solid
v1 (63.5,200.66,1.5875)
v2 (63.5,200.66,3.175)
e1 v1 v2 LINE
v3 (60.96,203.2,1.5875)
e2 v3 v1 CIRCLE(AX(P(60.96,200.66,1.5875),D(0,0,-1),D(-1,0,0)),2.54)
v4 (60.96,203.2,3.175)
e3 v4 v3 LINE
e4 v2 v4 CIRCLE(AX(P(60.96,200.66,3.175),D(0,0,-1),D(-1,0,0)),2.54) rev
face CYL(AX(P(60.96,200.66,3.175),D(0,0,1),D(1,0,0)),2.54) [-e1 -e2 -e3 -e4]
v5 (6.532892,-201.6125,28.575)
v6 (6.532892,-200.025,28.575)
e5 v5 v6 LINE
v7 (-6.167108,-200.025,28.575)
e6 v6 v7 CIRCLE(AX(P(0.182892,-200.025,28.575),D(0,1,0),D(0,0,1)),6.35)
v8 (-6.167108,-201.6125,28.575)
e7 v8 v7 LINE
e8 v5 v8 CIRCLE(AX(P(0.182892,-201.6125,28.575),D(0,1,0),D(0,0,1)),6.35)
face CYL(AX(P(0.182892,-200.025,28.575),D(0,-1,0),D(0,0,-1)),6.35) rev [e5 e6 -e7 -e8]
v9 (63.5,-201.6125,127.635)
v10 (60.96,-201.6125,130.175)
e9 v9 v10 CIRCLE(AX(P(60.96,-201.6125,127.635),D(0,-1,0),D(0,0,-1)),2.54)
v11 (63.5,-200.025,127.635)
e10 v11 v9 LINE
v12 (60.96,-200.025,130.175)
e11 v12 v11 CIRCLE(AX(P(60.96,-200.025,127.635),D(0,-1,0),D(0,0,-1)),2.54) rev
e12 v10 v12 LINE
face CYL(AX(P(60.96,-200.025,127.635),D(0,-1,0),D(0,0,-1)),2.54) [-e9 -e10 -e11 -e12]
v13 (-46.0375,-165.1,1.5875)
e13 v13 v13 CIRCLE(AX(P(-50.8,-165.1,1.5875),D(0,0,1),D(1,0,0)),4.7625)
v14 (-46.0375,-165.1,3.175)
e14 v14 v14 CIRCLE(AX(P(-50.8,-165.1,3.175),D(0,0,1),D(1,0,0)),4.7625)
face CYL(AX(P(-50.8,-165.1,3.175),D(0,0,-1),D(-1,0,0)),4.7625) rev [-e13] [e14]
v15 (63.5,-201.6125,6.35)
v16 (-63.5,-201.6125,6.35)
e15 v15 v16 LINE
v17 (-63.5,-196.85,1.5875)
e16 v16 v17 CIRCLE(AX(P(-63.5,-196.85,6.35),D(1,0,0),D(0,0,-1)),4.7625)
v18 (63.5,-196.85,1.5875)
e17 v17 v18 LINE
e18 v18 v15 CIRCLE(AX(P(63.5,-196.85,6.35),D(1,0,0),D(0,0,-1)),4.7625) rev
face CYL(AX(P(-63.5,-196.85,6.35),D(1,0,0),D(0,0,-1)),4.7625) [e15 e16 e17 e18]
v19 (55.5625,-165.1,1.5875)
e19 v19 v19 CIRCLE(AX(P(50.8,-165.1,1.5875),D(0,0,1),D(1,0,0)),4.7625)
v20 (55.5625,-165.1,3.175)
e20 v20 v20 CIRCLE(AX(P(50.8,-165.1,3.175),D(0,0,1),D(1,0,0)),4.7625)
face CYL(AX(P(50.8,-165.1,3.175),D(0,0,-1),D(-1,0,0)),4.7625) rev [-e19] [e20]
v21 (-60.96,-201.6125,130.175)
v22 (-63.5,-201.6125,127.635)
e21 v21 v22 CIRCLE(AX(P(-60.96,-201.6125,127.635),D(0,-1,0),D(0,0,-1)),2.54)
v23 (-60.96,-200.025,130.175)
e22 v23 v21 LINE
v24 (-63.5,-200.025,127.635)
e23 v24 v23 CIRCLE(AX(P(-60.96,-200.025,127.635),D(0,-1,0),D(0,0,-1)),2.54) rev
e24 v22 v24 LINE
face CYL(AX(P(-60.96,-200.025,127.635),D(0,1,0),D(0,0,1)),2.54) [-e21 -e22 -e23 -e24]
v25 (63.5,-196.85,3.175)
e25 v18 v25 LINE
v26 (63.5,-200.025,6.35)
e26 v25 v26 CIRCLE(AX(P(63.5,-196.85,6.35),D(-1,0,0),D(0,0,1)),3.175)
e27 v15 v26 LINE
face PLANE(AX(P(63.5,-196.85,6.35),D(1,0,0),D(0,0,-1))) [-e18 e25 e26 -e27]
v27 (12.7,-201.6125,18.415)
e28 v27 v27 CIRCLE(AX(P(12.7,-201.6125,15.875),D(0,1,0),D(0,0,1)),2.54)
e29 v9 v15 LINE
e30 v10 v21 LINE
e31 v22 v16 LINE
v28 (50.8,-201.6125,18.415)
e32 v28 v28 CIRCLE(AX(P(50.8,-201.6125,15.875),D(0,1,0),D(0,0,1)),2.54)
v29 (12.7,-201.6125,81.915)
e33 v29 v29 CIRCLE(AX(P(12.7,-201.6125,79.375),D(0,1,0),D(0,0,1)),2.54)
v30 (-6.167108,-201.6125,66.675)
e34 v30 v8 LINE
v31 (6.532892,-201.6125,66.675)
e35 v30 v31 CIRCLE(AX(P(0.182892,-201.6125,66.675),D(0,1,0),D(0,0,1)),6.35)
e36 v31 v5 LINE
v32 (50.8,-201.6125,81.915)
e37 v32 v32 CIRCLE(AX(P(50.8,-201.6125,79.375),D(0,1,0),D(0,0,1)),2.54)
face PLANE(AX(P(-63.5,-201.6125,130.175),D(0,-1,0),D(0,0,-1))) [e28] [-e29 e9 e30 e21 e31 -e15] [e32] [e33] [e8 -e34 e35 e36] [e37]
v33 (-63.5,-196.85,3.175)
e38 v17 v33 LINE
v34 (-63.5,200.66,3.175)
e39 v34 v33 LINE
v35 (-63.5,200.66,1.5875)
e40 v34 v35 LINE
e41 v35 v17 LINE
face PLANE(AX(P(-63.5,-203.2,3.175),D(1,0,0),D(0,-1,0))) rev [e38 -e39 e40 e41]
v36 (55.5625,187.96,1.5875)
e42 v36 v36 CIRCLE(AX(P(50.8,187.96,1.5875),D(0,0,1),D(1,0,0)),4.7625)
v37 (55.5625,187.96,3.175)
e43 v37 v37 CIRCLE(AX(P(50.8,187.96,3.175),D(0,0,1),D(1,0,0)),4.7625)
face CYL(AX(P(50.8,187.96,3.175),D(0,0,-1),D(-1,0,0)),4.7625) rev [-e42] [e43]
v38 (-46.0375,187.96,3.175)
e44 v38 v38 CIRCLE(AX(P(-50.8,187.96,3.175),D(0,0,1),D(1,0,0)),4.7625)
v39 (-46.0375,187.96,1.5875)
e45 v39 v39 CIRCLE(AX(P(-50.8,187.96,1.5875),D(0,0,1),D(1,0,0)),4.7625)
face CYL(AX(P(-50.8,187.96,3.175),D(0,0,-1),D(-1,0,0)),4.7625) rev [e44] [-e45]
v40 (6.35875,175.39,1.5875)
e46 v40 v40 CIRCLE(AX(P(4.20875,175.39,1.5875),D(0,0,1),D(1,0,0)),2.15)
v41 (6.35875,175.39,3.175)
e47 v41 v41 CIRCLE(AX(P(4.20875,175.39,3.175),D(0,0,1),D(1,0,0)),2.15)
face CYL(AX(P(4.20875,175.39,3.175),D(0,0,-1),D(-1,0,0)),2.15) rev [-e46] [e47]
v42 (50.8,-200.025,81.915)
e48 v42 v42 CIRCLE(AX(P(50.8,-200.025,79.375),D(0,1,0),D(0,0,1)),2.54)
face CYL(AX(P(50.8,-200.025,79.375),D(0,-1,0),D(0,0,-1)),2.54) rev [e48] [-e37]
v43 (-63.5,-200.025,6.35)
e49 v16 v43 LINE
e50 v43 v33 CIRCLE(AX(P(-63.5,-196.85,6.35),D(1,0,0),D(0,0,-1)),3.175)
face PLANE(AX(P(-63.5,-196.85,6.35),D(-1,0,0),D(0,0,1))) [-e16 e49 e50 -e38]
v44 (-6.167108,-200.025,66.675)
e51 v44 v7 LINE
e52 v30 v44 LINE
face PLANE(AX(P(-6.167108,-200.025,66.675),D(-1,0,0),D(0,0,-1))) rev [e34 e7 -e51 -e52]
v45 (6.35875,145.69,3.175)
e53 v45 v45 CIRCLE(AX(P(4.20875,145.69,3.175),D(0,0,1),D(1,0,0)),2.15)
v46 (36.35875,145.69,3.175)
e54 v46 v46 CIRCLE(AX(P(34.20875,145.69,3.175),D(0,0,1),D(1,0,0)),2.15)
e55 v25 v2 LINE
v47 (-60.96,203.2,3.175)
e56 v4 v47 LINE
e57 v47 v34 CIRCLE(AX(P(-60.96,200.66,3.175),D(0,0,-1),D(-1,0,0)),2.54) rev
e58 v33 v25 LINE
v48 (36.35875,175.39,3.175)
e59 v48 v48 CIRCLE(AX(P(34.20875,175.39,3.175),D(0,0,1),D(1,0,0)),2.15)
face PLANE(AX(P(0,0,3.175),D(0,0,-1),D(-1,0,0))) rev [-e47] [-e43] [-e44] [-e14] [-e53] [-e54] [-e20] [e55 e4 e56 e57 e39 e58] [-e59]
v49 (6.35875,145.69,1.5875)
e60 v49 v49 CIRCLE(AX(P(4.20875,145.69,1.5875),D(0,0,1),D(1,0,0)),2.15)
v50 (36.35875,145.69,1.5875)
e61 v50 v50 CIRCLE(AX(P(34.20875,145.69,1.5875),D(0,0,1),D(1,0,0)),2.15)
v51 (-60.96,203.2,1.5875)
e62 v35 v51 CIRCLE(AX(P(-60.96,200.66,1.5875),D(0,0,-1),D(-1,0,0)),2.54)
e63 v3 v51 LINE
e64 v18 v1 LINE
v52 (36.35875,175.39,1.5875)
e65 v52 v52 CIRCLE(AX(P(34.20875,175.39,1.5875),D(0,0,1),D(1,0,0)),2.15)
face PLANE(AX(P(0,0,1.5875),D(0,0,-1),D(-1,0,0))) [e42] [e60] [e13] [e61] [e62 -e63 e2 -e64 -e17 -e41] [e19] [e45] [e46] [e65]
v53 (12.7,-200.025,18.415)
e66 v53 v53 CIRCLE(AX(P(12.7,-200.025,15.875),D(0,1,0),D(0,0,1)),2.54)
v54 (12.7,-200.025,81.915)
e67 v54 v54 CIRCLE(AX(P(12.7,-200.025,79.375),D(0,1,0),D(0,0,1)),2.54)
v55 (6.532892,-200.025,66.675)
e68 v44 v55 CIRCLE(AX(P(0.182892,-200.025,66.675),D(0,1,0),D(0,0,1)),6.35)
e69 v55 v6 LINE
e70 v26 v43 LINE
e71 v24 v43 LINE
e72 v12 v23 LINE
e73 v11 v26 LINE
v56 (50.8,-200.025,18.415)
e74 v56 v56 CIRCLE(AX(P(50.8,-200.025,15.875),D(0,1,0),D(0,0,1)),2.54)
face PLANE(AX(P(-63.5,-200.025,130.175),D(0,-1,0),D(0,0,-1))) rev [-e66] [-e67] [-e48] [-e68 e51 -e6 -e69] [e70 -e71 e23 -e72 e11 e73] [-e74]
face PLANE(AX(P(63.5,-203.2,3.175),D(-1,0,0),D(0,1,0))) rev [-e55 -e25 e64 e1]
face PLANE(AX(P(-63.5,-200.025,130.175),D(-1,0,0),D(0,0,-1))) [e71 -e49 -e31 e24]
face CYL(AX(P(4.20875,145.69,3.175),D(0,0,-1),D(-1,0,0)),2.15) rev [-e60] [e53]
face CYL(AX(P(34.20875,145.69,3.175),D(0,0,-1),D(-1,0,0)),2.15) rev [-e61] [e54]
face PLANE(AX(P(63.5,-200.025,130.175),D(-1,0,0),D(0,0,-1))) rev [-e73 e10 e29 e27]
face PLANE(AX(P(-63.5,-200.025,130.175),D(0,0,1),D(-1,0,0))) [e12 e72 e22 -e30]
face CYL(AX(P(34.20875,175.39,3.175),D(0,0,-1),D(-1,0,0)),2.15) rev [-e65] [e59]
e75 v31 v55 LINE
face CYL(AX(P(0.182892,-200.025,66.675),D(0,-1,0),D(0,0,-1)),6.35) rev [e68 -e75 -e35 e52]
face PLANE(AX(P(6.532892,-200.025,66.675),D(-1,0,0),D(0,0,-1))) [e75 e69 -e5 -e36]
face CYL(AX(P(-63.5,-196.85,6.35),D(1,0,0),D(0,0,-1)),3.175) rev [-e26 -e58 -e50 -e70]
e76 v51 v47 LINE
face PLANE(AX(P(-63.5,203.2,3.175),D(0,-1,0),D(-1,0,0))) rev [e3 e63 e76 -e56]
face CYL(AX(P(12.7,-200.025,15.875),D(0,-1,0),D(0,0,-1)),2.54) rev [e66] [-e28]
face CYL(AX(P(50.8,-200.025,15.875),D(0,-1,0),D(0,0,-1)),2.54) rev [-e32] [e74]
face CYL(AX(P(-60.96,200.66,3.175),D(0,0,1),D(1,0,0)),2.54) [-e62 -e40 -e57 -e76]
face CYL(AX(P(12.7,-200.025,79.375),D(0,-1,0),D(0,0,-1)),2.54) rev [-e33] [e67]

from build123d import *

# Parameters (mm, degrees)
SKETCH2_W            = 127
SKETCH2_H            = 406.4
BOSS_EXTRUDE1_DEPTH  = 3.175
SKETCH3_W            = 127
SKETCH3_H            = 3.175
BOSS_EXTRUDE2_DEPTH  = 127
FILLET1_R            = 3.175
SKETCH4_R            = 2.54
CUT_EXTRUDE1_DEPTH   = 429.448574802
SKETCH5_R            = 4.7625
SKETCH5_R_2          = 2.15
CUT_EXTRUDE2_DEPTH   = 248.894110458
CONVERT_SOLID1_START = -63.5
CONVERT_SOLID1_DEPTH = 127
FILLET2_R            = 2.54


# Read off the part's stored shape, not the designer's step: Convert-Solid1
with BuildPart() as part:
    # Sketch2 → Boss-Extrude1 (new body)
    with BuildSketch(Plane.XY):
        Rectangle(SKETCH2_W, SKETCH2_H)
    extrude(amount=BOSS_EXTRUDE1_DEPTH)

    # Sketch3 → Boss-Extrude2 (add)
    with BuildSketch(Plane.XY.offset(3.175)):
        with Locations((0, -201.6125)):
            Rectangle(SKETCH3_W, SKETCH3_H)
    extrude(amount=BOSS_EXTRUDE2_DEPTH)

    # Fillet1
    fillet1_edges = [part.edges().sort_by_distance(p)[0] for p in [
        (0, -200.025, 3.175),
        (0, -203.2, 0),
    ]]
    fillet(fillet1_edges, radius=FILLET1_R)

    # Sketch4 → Cut-Extrude1 (cut, through all)
    with BuildSketch(Plane(origin=(0, -200.025, 0), x_dir=(1, 0, 0), z_dir=(0, 1, 0))):
        with BuildLine():
            ThreePointArc((-6.167107762, -66.675), (0.182892238, -73.025), (6.532892238, -66.675))
            Line((6.532892238, -66.675), (6.532892238, -28.575))
            ThreePointArc((6.532892238, -28.575), (0.182892238, -22.225), (-6.167107762, -28.575))
            Line((-6.167107762, -28.575), (-6.167107762, -66.675))
        make_face()
        with Locations(Location((12.7, -79.375, 0), (0, 0, 270))):
            Circle(SKETCH4_R)
        with Locations(Location((50.8, -79.375, 0), (0, 0, 270))):
            Circle(SKETCH4_R)
        with Locations(Location((50.8, -15.875, 0), (0, 0, 270))):
            Circle(SKETCH4_R)
        with Locations(Location((12.7, -15.875, 0), (0, 0, 270))):
            Circle(SKETCH4_R)
    extrude(amount=-CUT_EXTRUDE1_DEPTH, mode=Mode.SUBTRACT)

    # Sketch5 → Cut-Extrude2 (cut, through all)
    with BuildSketch(Plane.XY.offset(3.175)):
        with Locations((-50.8, 187.96)):
            Circle(SKETCH5_R)
        with Locations((50.8, 187.96)):
            Circle(SKETCH5_R)
        with Locations((-50.8, -165.1)):
            Circle(SKETCH5_R)
        with Locations((50.8, -165.1)):
            Circle(SKETCH5_R)
        with Locations((34.20875, 175.39)):
            Circle(SKETCH5_R_2)
        with Locations((4.20875, 175.39)):
            Circle(SKETCH5_R_2)
        with Locations((4.20875, 145.69)):
            Circle(SKETCH5_R_2)
        with Locations((34.20875, 145.69)):
            Circle(SKETCH5_R_2)
    extrude(amount=-CUT_EXTRUDE2_DEPTH, mode=Mode.SUBTRACT)

    # Convert-Solid1 outline → Convert-Solid1 (cut)
    with BuildSketch(Plane.YZ.offset(CONVERT_SOLID1_START)):
        with BuildLine():
            ThreePointArc((-196.85, 1.5875), (-200.217596045, 2.982403955), (-201.6125, 6.35))
            Line((-201.6125, 6.35), (-201.6125, 130.175))
            Line((-201.6125, 130.175), (-203.2, 130.175))
            Line((-203.2, 130.175), (-203.2, 3.175))
            ThreePointArc((-203.2, 3.175), (-202.27006403, 0.92993597), (-200.025, 0))
            Line((-200.025, 0), (203.2, 0))
            Line((203.2, 0), (203.2, 1.5875))
            Line((203.2, 1.5875), (-196.85, 1.5875))
        make_face()
    extrude(amount=CONVERT_SOLID1_DEPTH, mode=Mode.SUBTRACT)

    # Fillet2
    fillet2_edges = [part.edges().sort_by_distance(p)[0] for p in [
        (63.5, -200.81875, 130.175),
        (-63.5, -200.81875, 130.175),
        (-63.5, 203.2, 2.38125),
        (63.5, 203.2, 2.38125),
    ]]
    fillet(fillet2_edges, radius=FILLET2_R)


solid = part.part
